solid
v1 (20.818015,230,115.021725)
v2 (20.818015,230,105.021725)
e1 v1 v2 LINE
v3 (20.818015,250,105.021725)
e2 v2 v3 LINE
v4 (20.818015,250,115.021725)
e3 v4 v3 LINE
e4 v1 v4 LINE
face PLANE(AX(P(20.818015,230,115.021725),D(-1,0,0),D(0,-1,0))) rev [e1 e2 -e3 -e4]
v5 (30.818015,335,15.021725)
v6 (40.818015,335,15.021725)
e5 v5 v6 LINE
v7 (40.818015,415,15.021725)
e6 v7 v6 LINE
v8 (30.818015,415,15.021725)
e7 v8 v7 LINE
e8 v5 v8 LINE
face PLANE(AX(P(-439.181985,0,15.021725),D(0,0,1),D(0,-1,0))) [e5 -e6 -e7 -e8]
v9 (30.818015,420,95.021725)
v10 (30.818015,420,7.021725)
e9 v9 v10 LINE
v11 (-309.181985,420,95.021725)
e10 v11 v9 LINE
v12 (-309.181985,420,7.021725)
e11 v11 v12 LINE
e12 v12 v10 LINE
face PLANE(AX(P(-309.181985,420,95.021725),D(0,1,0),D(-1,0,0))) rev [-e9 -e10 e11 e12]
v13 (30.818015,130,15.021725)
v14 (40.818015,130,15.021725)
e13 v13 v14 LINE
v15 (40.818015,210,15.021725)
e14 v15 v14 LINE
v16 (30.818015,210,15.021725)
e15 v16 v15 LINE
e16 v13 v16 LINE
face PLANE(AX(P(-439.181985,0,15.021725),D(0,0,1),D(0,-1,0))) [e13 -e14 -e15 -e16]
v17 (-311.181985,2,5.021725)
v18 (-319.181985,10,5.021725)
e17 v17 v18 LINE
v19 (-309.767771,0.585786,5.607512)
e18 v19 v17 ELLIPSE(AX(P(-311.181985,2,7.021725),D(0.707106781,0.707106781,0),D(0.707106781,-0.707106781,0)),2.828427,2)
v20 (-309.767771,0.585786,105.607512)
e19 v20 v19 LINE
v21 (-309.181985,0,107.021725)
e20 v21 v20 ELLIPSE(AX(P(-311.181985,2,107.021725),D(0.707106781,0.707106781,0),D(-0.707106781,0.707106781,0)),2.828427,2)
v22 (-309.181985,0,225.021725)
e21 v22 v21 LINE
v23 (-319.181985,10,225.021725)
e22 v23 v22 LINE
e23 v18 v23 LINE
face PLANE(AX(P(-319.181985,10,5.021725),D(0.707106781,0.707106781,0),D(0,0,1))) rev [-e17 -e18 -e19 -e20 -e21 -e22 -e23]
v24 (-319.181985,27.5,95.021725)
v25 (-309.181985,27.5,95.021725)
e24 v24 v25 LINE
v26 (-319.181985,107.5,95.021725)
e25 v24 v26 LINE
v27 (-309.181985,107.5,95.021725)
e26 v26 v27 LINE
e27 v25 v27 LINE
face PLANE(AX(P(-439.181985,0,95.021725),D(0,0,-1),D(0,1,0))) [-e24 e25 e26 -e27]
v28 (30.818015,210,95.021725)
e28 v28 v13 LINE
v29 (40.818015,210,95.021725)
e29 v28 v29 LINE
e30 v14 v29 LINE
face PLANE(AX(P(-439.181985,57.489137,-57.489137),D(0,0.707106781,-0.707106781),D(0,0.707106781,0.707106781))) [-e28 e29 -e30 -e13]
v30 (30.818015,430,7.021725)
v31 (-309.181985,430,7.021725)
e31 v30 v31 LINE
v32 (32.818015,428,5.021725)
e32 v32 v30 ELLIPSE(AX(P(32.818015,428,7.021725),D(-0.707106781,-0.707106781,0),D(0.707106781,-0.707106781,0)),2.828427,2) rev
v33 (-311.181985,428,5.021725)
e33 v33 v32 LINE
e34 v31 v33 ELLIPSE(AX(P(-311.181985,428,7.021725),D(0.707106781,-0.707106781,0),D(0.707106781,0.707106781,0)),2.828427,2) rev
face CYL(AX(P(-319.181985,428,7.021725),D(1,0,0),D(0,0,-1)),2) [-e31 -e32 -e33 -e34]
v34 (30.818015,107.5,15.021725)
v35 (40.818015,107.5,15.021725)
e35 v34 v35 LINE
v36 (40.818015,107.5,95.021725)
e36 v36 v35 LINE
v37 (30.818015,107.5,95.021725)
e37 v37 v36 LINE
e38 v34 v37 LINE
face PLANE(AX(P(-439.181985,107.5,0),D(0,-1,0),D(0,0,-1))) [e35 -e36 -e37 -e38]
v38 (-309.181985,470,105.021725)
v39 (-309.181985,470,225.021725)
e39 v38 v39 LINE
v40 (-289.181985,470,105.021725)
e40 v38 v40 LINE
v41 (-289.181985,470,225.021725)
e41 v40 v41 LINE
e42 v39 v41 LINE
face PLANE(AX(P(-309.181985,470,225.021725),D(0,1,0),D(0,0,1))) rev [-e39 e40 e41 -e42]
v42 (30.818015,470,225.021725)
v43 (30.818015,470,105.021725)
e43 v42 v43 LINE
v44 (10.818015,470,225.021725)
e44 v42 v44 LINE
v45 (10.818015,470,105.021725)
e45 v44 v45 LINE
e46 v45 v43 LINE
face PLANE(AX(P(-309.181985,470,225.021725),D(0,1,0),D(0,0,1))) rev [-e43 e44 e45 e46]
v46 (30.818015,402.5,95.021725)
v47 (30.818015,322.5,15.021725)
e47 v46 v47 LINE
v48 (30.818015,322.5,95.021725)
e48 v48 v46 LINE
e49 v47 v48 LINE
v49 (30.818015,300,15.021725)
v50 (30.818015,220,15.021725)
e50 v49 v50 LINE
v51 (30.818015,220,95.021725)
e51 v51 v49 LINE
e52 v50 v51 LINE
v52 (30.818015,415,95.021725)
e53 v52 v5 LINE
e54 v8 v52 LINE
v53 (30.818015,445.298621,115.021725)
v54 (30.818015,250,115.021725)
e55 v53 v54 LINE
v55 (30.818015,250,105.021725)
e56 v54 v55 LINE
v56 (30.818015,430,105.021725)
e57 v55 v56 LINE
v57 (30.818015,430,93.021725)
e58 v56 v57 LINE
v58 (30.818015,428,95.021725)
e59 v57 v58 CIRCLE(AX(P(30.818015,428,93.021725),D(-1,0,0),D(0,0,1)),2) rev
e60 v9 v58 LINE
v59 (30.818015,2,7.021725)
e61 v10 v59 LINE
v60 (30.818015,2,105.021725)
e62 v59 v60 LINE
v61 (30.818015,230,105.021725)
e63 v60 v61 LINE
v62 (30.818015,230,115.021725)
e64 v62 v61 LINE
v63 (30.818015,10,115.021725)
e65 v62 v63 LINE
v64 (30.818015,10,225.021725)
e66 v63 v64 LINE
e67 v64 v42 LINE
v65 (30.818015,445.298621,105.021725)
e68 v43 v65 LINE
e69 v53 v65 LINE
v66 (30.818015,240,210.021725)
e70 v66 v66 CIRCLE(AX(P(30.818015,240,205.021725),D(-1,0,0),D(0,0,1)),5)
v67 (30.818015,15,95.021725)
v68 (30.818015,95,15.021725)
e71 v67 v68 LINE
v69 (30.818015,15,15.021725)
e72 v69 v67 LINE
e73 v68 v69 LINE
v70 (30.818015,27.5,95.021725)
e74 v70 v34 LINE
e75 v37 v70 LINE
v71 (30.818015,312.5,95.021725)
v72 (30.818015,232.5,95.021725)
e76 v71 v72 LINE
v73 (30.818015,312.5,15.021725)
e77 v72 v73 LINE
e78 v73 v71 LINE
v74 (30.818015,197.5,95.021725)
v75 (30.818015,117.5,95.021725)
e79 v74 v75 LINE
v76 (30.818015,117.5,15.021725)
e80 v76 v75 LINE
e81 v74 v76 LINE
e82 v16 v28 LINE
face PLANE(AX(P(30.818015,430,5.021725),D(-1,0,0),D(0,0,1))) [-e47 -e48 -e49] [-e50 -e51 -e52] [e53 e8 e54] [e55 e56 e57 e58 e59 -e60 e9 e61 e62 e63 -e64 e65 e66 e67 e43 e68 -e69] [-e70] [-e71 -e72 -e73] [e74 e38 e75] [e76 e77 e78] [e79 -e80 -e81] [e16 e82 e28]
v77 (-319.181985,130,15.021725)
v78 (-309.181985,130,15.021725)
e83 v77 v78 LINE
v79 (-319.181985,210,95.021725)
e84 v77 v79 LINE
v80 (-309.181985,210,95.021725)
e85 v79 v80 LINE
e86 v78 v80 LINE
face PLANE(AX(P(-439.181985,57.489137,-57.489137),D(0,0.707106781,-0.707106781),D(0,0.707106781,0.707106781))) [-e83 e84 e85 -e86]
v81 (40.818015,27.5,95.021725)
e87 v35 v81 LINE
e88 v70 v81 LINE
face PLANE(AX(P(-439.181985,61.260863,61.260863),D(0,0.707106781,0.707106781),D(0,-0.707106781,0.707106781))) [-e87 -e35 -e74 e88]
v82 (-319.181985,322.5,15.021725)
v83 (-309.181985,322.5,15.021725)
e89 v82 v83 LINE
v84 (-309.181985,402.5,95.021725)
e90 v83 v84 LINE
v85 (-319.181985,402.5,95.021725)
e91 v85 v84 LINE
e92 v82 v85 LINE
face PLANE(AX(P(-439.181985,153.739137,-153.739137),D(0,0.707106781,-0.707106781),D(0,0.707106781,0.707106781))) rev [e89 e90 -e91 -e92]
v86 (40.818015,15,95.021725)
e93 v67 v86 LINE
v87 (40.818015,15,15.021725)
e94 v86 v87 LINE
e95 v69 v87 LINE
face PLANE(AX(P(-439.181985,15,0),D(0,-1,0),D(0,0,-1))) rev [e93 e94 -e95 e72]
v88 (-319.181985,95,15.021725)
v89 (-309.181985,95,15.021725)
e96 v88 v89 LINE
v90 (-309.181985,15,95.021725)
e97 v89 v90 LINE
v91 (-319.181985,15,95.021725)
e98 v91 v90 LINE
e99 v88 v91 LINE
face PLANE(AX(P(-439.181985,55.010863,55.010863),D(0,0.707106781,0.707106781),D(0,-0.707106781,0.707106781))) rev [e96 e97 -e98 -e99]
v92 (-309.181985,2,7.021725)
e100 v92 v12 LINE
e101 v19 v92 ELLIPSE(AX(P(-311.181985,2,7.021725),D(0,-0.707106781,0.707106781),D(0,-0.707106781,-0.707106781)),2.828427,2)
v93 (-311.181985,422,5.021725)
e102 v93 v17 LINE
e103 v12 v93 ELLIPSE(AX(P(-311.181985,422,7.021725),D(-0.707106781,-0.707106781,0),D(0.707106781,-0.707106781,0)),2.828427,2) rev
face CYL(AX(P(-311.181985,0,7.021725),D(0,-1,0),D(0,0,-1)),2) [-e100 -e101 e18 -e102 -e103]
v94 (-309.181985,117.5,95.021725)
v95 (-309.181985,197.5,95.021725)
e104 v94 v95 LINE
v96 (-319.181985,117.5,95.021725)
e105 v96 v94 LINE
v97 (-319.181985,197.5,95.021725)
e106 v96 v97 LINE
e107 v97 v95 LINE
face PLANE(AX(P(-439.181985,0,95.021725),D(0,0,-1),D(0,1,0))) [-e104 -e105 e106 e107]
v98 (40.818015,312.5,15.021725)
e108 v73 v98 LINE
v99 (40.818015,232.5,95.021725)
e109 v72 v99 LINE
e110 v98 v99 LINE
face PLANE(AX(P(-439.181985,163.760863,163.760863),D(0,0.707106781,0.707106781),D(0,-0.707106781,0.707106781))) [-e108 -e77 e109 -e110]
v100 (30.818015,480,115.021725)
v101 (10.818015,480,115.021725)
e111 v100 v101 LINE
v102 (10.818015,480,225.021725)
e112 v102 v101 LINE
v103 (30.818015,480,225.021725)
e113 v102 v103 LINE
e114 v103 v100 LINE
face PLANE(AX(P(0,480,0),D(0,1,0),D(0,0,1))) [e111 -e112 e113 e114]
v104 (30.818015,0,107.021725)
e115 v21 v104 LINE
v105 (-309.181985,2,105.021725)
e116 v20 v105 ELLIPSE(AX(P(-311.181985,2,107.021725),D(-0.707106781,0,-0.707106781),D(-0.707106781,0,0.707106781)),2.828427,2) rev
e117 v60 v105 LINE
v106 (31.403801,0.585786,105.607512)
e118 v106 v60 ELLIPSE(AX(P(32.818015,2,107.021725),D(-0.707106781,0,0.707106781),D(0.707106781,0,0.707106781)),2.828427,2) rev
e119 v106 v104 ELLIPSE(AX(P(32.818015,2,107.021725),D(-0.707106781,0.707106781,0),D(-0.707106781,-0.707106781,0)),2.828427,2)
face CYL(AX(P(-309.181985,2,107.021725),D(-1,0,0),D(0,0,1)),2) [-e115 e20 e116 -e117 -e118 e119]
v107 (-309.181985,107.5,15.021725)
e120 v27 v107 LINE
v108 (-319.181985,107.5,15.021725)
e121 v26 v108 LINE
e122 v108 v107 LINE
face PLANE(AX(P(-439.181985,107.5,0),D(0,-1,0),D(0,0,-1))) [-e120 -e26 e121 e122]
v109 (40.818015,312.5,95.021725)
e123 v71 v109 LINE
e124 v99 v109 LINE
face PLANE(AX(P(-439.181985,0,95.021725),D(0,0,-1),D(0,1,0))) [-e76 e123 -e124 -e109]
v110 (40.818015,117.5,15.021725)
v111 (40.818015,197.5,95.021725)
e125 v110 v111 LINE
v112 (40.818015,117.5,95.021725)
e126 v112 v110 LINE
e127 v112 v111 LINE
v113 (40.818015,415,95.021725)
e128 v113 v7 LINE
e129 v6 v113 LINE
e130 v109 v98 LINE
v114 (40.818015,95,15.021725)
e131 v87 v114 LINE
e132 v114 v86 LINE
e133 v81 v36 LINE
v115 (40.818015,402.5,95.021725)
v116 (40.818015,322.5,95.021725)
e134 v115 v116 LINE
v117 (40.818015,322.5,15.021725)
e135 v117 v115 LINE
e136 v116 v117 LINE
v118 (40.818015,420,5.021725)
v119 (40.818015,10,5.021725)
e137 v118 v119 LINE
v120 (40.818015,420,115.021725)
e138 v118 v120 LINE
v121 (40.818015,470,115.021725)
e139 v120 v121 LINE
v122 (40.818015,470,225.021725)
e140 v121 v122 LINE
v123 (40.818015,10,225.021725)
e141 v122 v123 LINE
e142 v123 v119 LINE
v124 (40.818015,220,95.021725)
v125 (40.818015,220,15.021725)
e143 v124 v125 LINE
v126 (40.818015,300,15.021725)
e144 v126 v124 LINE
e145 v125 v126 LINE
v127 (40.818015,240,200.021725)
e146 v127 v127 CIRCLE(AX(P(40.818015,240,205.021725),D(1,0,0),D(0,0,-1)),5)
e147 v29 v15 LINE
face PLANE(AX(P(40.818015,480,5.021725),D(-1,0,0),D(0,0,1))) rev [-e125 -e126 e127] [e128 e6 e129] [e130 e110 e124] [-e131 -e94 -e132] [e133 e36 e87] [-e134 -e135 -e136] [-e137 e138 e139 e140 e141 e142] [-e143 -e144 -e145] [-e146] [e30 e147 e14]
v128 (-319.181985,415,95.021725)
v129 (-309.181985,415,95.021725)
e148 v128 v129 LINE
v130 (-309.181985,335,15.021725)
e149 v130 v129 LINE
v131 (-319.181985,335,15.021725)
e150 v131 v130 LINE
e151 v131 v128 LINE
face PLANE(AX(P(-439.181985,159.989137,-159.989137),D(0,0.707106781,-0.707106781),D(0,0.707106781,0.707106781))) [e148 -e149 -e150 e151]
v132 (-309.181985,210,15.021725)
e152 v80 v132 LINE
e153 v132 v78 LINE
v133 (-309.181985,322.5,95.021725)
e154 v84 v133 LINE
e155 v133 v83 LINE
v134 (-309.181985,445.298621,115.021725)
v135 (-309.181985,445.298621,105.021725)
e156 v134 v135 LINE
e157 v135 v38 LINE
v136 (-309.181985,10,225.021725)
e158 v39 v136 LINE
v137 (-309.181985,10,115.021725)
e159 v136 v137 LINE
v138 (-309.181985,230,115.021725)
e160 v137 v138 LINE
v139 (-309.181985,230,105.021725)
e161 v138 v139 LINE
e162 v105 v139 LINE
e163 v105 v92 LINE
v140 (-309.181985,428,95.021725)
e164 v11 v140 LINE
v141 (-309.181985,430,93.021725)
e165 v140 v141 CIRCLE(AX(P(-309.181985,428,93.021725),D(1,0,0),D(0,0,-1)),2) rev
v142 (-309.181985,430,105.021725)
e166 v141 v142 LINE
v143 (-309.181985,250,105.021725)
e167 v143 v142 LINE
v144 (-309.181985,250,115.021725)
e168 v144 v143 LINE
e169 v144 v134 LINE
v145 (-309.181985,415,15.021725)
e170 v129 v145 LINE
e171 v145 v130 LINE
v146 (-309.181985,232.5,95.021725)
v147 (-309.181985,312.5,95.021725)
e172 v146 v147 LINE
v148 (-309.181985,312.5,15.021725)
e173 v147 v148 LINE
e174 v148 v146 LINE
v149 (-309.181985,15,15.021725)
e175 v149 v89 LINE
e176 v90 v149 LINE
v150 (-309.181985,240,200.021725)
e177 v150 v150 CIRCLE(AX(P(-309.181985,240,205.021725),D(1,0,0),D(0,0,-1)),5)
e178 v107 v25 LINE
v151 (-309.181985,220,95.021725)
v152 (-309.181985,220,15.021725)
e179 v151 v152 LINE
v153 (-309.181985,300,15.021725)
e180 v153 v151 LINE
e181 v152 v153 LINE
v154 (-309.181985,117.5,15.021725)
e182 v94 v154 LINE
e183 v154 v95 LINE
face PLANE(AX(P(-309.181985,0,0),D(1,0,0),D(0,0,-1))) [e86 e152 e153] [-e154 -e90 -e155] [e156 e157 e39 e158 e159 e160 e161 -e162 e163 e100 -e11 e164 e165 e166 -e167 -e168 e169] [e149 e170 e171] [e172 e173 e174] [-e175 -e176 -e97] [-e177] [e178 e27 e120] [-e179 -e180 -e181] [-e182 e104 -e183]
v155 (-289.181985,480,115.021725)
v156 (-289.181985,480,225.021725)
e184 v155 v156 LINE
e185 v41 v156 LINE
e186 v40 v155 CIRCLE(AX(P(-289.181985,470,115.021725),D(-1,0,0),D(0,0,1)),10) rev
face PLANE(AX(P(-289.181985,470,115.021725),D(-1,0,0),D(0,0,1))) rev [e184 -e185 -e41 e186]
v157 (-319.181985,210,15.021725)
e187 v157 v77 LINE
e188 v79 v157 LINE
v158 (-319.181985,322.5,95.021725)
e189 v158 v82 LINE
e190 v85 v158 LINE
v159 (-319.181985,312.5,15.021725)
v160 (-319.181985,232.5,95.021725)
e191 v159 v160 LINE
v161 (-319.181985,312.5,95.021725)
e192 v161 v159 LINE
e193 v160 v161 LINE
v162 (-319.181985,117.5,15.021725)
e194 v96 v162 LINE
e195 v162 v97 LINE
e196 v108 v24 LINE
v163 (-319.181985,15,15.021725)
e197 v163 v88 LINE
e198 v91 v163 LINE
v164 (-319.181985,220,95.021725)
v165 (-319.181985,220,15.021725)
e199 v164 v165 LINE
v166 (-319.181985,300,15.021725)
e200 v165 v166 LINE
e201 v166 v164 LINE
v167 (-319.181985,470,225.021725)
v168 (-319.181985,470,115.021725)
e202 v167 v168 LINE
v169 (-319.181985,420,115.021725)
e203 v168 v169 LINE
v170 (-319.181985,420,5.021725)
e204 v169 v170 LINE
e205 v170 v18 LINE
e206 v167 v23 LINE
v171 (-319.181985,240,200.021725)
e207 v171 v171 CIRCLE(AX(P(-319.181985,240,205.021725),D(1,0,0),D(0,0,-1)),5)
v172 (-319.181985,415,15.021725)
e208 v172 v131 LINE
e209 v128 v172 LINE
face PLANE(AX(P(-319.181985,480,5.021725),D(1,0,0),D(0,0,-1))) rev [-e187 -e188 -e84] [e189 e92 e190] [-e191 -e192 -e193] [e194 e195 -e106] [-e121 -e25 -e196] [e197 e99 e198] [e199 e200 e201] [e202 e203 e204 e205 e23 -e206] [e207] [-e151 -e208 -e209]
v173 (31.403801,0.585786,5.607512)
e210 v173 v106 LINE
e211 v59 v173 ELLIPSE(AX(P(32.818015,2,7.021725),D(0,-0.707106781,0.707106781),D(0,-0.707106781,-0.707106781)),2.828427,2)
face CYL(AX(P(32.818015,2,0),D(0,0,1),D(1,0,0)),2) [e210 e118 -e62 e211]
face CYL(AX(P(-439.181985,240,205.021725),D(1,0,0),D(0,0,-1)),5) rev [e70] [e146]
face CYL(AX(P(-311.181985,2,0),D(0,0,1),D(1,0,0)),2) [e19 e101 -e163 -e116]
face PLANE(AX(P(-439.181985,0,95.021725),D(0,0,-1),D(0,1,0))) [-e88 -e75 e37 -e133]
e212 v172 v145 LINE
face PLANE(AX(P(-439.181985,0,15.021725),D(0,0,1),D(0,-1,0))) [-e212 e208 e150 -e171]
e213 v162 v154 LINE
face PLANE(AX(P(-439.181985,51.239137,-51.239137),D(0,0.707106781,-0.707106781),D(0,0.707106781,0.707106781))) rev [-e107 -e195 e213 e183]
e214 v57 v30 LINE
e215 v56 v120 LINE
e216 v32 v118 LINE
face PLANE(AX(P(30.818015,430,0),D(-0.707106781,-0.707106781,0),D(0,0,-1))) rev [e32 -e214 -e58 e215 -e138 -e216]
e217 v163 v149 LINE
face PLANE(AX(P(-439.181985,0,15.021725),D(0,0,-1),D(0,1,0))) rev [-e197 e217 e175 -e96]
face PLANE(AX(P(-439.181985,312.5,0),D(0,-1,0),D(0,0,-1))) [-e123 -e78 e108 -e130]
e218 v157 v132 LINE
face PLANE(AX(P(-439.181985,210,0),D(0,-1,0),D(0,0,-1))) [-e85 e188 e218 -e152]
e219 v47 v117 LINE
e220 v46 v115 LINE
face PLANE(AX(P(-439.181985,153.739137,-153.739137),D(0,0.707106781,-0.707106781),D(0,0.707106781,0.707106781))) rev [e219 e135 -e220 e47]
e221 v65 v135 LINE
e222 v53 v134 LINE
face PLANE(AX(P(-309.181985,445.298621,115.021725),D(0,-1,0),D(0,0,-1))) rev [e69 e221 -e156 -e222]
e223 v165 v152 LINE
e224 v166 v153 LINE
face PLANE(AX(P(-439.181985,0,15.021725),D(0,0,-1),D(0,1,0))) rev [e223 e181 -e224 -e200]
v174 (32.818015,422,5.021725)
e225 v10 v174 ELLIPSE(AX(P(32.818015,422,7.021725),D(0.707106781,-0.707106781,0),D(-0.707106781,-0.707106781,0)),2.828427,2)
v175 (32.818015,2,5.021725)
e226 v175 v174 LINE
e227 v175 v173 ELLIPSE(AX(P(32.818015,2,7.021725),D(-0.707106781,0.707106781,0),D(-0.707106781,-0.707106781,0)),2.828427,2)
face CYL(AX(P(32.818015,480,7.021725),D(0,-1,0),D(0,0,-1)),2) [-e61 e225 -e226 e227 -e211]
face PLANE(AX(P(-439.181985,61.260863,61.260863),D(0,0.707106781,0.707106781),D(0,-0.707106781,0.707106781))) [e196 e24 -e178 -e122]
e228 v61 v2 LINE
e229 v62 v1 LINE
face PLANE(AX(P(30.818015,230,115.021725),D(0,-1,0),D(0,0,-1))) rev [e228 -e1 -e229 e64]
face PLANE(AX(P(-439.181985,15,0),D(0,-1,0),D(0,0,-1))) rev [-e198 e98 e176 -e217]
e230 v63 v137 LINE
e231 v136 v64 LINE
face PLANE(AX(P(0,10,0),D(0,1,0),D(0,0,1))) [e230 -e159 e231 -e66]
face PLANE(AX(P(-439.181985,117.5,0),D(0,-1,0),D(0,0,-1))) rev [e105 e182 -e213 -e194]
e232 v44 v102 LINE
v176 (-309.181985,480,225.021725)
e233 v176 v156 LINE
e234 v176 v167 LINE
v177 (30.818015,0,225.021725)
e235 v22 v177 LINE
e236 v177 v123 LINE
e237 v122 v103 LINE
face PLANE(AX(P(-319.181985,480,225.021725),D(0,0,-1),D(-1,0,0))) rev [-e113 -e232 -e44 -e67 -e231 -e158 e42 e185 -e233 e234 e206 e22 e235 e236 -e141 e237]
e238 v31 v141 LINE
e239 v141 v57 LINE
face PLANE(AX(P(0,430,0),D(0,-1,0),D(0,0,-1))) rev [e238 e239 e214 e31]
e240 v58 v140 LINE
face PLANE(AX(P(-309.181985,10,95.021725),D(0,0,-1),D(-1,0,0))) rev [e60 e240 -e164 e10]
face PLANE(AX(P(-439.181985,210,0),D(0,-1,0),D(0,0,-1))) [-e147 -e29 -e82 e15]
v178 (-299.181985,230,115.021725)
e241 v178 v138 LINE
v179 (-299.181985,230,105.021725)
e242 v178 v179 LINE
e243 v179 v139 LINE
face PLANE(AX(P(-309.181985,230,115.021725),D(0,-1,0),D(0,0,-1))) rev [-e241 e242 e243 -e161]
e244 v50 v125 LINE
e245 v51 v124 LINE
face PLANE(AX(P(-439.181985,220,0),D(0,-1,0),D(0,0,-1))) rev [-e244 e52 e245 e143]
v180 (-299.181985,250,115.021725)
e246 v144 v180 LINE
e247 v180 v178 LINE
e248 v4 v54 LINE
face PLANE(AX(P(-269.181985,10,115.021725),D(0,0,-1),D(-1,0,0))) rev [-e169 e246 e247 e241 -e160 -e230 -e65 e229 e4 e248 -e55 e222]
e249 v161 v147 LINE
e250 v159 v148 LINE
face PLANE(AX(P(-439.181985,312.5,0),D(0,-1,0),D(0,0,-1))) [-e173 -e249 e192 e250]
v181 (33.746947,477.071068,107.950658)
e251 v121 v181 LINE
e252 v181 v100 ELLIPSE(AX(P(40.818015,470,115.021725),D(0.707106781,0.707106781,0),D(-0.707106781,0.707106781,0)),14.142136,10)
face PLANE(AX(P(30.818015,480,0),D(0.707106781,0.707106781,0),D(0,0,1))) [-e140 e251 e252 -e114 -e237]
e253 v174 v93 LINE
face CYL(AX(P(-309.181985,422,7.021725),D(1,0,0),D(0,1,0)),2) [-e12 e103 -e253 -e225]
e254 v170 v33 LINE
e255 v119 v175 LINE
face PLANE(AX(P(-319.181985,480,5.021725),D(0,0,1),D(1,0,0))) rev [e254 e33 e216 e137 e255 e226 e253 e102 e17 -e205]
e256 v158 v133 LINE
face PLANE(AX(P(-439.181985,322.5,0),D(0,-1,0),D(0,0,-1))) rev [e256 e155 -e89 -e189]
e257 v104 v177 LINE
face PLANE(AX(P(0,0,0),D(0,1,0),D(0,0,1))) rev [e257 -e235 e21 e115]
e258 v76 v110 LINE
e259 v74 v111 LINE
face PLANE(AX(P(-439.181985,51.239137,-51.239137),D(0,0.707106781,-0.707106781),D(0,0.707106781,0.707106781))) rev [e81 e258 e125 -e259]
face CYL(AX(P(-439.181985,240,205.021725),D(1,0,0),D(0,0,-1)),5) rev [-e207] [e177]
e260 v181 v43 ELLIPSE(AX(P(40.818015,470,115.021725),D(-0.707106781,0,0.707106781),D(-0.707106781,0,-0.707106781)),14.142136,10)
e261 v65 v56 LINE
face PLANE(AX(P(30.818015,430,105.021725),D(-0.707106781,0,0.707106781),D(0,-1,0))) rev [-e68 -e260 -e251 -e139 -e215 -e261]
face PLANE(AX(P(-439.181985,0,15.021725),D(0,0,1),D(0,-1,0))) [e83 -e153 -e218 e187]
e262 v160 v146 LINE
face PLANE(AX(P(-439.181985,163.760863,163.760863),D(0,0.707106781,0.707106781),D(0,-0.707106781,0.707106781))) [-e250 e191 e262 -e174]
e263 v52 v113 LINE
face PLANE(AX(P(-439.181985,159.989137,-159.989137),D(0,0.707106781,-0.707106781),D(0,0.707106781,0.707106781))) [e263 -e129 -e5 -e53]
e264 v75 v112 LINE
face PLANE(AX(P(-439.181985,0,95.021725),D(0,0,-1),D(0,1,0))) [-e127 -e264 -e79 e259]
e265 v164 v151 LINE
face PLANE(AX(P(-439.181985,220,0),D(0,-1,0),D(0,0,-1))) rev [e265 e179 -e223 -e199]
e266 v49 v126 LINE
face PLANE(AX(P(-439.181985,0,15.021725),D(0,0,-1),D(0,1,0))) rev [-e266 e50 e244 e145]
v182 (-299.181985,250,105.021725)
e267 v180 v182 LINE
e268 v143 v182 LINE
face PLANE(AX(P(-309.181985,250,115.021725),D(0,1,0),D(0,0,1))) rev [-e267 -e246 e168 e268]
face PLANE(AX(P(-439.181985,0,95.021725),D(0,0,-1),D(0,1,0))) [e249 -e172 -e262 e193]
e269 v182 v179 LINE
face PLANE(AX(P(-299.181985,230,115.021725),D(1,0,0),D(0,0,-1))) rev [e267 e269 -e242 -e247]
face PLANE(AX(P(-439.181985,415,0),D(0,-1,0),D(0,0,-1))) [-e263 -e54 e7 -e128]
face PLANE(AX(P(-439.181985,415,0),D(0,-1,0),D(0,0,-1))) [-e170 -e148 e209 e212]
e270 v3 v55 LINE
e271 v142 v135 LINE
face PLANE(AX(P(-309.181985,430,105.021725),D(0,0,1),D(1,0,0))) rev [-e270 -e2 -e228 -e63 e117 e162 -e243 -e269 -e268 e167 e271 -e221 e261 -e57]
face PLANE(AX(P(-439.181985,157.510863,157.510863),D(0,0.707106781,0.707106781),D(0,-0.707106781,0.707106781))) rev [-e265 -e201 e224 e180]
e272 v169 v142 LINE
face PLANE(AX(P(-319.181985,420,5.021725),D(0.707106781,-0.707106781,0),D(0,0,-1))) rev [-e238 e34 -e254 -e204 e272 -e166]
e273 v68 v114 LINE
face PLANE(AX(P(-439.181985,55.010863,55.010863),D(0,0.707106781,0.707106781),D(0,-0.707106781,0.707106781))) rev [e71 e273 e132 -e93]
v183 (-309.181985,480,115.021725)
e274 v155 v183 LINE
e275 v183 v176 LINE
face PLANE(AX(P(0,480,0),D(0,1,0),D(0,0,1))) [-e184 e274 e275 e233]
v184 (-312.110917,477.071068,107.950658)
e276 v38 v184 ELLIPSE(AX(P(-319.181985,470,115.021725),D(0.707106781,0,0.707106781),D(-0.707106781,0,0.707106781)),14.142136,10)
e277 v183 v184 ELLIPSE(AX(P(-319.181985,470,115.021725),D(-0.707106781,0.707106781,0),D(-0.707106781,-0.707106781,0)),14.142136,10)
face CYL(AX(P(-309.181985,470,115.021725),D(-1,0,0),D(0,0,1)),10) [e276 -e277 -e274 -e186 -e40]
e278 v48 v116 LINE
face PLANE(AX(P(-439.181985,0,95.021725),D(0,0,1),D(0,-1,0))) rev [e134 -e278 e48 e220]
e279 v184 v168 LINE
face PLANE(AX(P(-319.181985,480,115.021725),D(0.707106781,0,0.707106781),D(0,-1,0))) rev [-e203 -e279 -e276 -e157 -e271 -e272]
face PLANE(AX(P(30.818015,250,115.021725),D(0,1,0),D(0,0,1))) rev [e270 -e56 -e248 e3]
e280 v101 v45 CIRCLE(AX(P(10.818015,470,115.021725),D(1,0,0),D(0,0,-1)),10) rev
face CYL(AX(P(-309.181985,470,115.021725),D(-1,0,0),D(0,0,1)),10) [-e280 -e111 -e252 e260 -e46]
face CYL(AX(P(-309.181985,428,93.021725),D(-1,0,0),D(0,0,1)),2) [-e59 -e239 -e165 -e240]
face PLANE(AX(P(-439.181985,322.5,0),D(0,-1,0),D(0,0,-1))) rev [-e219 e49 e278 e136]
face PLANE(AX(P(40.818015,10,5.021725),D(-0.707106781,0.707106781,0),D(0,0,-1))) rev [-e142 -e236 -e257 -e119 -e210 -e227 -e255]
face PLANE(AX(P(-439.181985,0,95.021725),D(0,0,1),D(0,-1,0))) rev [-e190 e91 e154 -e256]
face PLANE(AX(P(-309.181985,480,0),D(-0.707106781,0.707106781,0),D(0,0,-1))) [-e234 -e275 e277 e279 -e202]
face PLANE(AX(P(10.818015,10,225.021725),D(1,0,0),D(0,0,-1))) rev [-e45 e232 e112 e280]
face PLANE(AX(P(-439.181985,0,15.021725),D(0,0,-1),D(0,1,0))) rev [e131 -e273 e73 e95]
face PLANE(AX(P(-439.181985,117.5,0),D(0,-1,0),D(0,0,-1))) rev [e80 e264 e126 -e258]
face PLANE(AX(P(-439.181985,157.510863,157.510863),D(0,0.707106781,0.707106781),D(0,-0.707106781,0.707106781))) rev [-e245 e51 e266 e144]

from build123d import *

# Parameters (mm, degrees)
SKETCH2_W                = 360
SKETCH2_H                = 220
BOSS_EXTRUDE1_DEPTH      = 480
SKETCH4_W                = 280
SKETCH4_H                = 110
CUT_EXTRUDE2_DEPTH       = 470
SKETCH5_W                = 110
SKETCH5_H                = 460
CUT_EXTRUDE3_DEPTH       = 40
SKETCH6_W                = 340
SKETCH6_H                = 100
CUT_EXTRUDE4_DEPTH       = 50
SKETCH7_W                = 340
SKETCH7_H                = 10
CUT_EXTRUDE5_DEPTH       = 420
SKETCH8_W                = 340
SKETCH8_H                = 410
CUT_EXTRUDE6_DEPTH       = 90
SKETCH12_W               = 10
SKETCH12_H               = 20
CUT_EXTRUDE9_DEPTH       = 10
CUT_EXTRUDE11_DEPTH      = 470
CUT_EXTRUDE11_DEPTH_BACK = 10
SKETCH18_W               = 100
SKETCH18_H               = 50
SKETCH23_W               = 110
SKETCH23_H               = 460
CUT_EXTRUDE13_DEPTH      = 20
SKETCH24_W               = 20
SKETCH24_H               = 110
CUT_EXTRUDE14_DEPTH      = 10
SKETCH26_R               = 5
CUT_EXTRUDE15_DEPTH      = 480
CUT_EXTRUDE16_DEPTH      = 480
SKETCH28_W               = 340
SKETCH28_H               = 10
CUT_EXTRUDE17_DEPTH      = 100
CHAMFER1_SIZE            = 10
CHAMFER2_SIZE            = 10
FILLET2_R                = 10
CHAMFER3_SIZE            = 10
FILLET4_R                = 2
FILLET5_R                = 2
CHAMFER4_SIZE            = 10
SKETCH29_W               = 340
SKETCH29_H               = 24.70137943
CUT_EXTRUDE18_DEPTH      = 10
SKETCH30_W               = 300
SKETCH30_H               = 27.571183361
CUT_EXTRUDE19_DEPTH      = 10


# Some blends are built 0.0001 mm under size
with BuildPart() as part:
    # Sketch2 → Boss-Extrude1 (new body)
    with BuildSketch(Plane(origin=(0, 0, 0), x_dir=(1, 0, 0), z_dir=(0, 1, 0))):
        with Locations((-139.181984943, -115.021725484)):
            Rectangle(SKETCH2_W, SKETCH2_H)
    extrude(amount=BOSS_EXTRUDE1_DEPTH)

    # Sketch4 → Cut-Extrude2 (cut)
    with BuildSketch(Plane(origin=(0, 480, 0), x_dir=(1, 0, 0), z_dir=(0, 1, 0))):
        with Locations((-129.181984943, -170.021725484)):
            Rectangle(SKETCH4_W, SKETCH4_H)
    extrude(amount=-CUT_EXTRUDE2_DEPTH, mode=Mode.SUBTRACT)

    # Sketch5 → Cut-Extrude3 (cut)
    with BuildSketch(Plane(origin=(-269.181984943, 0, 0), x_dir=(0, 0, -1), z_dir=(1, 0, 0))):
        with Locations((-170.021725484, 240)):
            Rectangle(SKETCH5_W, SKETCH5_H)
    extrude(amount=-CUT_EXTRUDE3_DEPTH, mode=Mode.SUBTRACT)

    # Sketch6 → Cut-Extrude4 (cut)
    with BuildSketch(Plane(origin=(0, 480, 0), x_dir=(1, 0, 0), z_dir=(0, 1, 0))):
        with Locations((-139.181984943, -55.021725484)):
            Rectangle(SKETCH6_W, SKETCH6_H)
    extrude(amount=-CUT_EXTRUDE4_DEPTH, mode=Mode.SUBTRACT)

    # Sketch7 → Cut-Extrude5 (cut)
    with BuildSketch(Plane(origin=(0, 430, 0), x_dir=(1, 0, 0), z_dir=(0, 1, 0))):
        with Locations((-139.181984943, -100.021725484)):
            Rectangle(SKETCH7_W, SKETCH7_H)
    extrude(amount=-CUT_EXTRUDE5_DEPTH, mode=Mode.SUBTRACT)

    # Sketch8 → Cut-Extrude6 (cut)
    with BuildSketch(Plane(origin=(0, 0, 5.021725484), x_dir=(-1, 0, 0), z_dir=(0, 0, -1))):
        with Locations((139.181984943, 215)):
            Rectangle(SKETCH8_W, SKETCH8_H)
    extrude(amount=-CUT_EXTRUDE6_DEPTH, mode=Mode.SUBTRACT)

    # Sketch12 → Cut-Extrude9 (cut)
    with BuildSketch(Plane(origin=(0, 0, 105.021725484), x_dir=(-1, 0, 0), z_dir=(0, 0, -1))):
        with Locations((-25.818015057, 240)):
            Rectangle(SKETCH12_W, SKETCH12_H)
        with Locations((304.181984943, 240)):
            Rectangle(SKETCH12_W, SKETCH12_H)
    extrude(amount=-CUT_EXTRUDE9_DEPTH, mode=Mode.SUBTRACT)

    # Sketch18 → Cut-Extrude11 (cut, two sides: drawn at the far end of the back side and taken through both)
    with BuildSketch(Plane(origin=(-309.181984943, 0, 0), x_dir=(0, 0, -1), z_dir=(1, 0, 0)).offset(-CUT_EXTRUDE11_DEPTH_BACK)):
        with Locations((-55.021725484, 455)):
            Rectangle(SKETCH18_W, SKETCH18_H)
    extrude(amount=CUT_EXTRUDE11_DEPTH + CUT_EXTRUDE11_DEPTH_BACK, mode=Mode.SUBTRACT)

    # Sketch23 → Cut-Extrude13 (cut)
    with BuildSketch(Plane.ZY.offset(-10.818015057)):
        with Locations((170.021725484, 240)):
            Rectangle(SKETCH23_W, SKETCH23_H)
    extrude(amount=-CUT_EXTRUDE13_DEPTH, mode=Mode.SUBTRACT)

    # Sketch24 → Cut-Extrude14 (cut)
    with BuildSketch(Plane(origin=(0, 480, 0), x_dir=(1, 0, 0), z_dir=(0, 1, 0))):
        with Locations((-279.181984943, -170.021725484)):
            Rectangle(SKETCH24_W, SKETCH24_H)
    extrude(amount=-CUT_EXTRUDE14_DEPTH, mode=Mode.SUBTRACT)

    # Sketch26 → Cut-Extrude15 (cut)
    with BuildSketch(Plane(origin=(40.818015057, 0, 0), x_dir=(0, 0, -1), z_dir=(1, 0, 0))):
        with Locations((-205.021725484, 240)):
            Circle(SKETCH26_R)
    extrude(amount=-CUT_EXTRUDE15_DEPTH, mode=Mode.SUBTRACT)

    # Sketch27 → Cut-Extrude16 (cut)
    with BuildSketch(Plane(origin=(40.818015057, 0, 0), x_dir=(0, 0, -1), z_dir=(1, 0, 0))):
        Polygon((-15.021725484, 335), (-95.021725484, 415), (-15.021725484, 415), align=None)
        Polygon((-15.021725484, 322.5), (-95.021725484, 402.5), (-95.021725484, 322.5), align=None)
        Polygon((-15.021725484, 312.5), (-95.021725484, 232.5), (-95.021725484, 312.5), align=None)
        Polygon((-15.021725484, 220), (-15.021725484, 300), (-95.021725484, 220), align=None)
        Polygon((-15.021725484, 130), (-95.021725484, 210), (-15.021725484, 210), align=None)
        Polygon((-95.021725484, 117.5), (-95.021725484, 197.5), (-15.021725484, 117.5), align=None)
        Polygon((-15.021725484, 107.5), (-95.021725484, 27.5), (-95.021725484, 107.5), align=None)
        Polygon((-15.021725484, 15), (-15.021725484, 95), (-95.021725484, 15), align=None)
    extrude(amount=-CUT_EXTRUDE16_DEPTH, mode=Mode.SUBTRACT)

    # Sketch28 → Cut-Extrude17 (cut)
    with BuildSketch(Plane(origin=(0, 0, 5.021725484), x_dir=(-1, 0, 0), z_dir=(0, 0, -1))):
        with Locations((139.181984943, 5)):
            Rectangle(SKETCH28_W, SKETCH28_H)
    extrude(amount=-CUT_EXTRUDE17_DEPTH, mode=Mode.SUBTRACT)

    # Chamfer1
    chamfer1_edges = [part.edges().sort_by_distance(p)[0] for p in [
        (40.818015057, 430, 55.021725484),
        (-319.181984943, 430, 55.021725484),
    ]]
    chamfer(chamfer1_edges, length=CHAMFER1_SIZE - 0.0001)  # a hair under: the kernel refuses the full size

    # Chamfer2
    chamfer2_edges = [part.edges().sort_by_distance(p)[0] for p in [
        (-319.181984943, 480, 165.021725484),
        (40.818015057, 480, 165.021725484),
    ]]
    chamfer(chamfer2_edges, length=CHAMFER2_SIZE)

    # Fillet2
    fillet2_edges = [part.edges().sort_by_distance(p)[0] for p in [
        (-139.181984943, 480, 105.021725484),
    ]]
    fillet(fillet2_edges, radius=FILLET2_R - 0.0001)  # a hair under: the kernel refuses the full size

    # Chamfer3
    # the kernel refuses this chamfer: 10 mm, written as the material it takes off along each edge
    with BuildSketch(Plane(origin=(-319.181984943, 495.71682988, 105.021725484), x_dir=(0.9996219169112968, 0, -0.027495876610586282), z_dir=(0, -1, 0))) as chamfer3_piece_1_section:
        Polygon((CHAMFER3_SIZE * 0.999621916911, CHAMFER3_SIZE * 0.0274958766106), (-CHAMFER3_SIZE * 0.0274958766106, CHAMFER3_SIZE * 0.999621916911), (0, 0), align=None)
    chamfer3_piece_1 = extrude(amount=101.433559759, mode=Mode.PRIVATE)
    chamfer3_piece_1 = split(chamfer3_piece_1, bisect_by=Plane(origin=(-315.895641605, 430, 108.325767027), z_dir=(0, 1, 0)), keep=Keep.TOP, mode=Mode.PRIVATE)
    chamfer3_piece_1 = split(chamfer3_piece_1, bisect_by=Plane(origin=(-309.181984943, 462.85841494, 108.325767027), z_dir=(-1, 0, 0)), keep=Keep.TOP, mode=Mode.PRIVATE)
    add(chamfer3_piece_1, mode=Mode.SUBTRACT)
    with BuildSketch(Plane(origin=(-319.181984943, 495.71682988, 105.021725484), x_dir=(0.9996219169112968, 0, -0.027495876610586282), z_dir=(0, -1, 0))) as chamfer3_piece_2_section:
        Polygon((CHAMFER3_SIZE * 0.999621916911, CHAMFER3_SIZE * 0.0274958766106), (-CHAMFER3_SIZE * 0.0274958766106, CHAMFER3_SIZE * 0.999621916911), (0, 0), align=None)
    chamfer3_piece_2 = extrude(amount=101.433559759, mode=Mode.PRIVATE)
    chamfer3_piece_2 = split(chamfer3_piece_2, bisect_by=Plane(origin=(-314.919016281, 424.263068662, 108.826082354), z_dir=(-0.7071067811865476, 0.7071067811865476, 0)), keep=Keep.TOP, mode=Mode.PRIVATE)
    chamfer3_piece_2 = split(chamfer3_piece_2, bisect_by=Plane(origin=(-316.831326727, 430, 108.826082354), z_dir=(0, -1, 0)), keep=Keep.TOP, mode=Mode.PRIVATE)
    add(chamfer3_piece_2, mode=Mode.SUBTRACT)
    with BuildSketch(Plane(origin=(40.818015057, 394.28327012, 105.021725484), x_dir=(-0.9996219169112968, 0, -0.027495876610586317), z_dir=(0, 1, 0))) as chamfer3_piece_3_section:
        Polygon((CHAMFER3_SIZE * 0.999621916911, CHAMFER3_SIZE * 0.0274958766106), (-CHAMFER3_SIZE * 0.0274958766106, CHAMFER3_SIZE * 0.999621916911), (0, 0), align=None)
    chamfer3_piece_3 = extrude(amount=101.433559759, mode=Mode.PRIVATE)
    chamfer3_piece_3 = split(chamfer3_piece_3, bisect_by=Plane(origin=(36.555046395, 424.263068662, 108.826082354), z_dir=(0.7071067811865485, 0.7071067811865467, 0)), keep=Keep.TOP, mode=Mode.PRIVATE)
    chamfer3_piece_3 = split(chamfer3_piece_3, bisect_by=Plane(origin=(38.46735684, 430, 108.826082354), z_dir=(0, -1, 0)), keep=Keep.TOP, mode=Mode.PRIVATE)
    add(chamfer3_piece_3, mode=Mode.SUBTRACT)
    with BuildSketch(Plane(origin=(40.818015057, 394.28327012, 105.021725484), x_dir=(-0.9996219169112968, 0, -0.027495876610586317), z_dir=(0, 1, 0))) as chamfer3_piece_4_section:
        Polygon((CHAMFER3_SIZE * 0.999621916911, CHAMFER3_SIZE * 0.0274958766106), (-CHAMFER3_SIZE * 0.0274958766106, CHAMFER3_SIZE * 0.999621916911), (0, 0), align=None)
    chamfer3_piece_4 = extrude(amount=101.433559759, mode=Mode.PRIVATE)
    chamfer3_piece_4 = split(chamfer3_piece_4, bisect_by=Plane(origin=(37.531671719, 430, 108.325767027), z_dir=(0, 1, 0)), keep=Keep.TOP, mode=Mode.PRIVATE)
    chamfer3_piece_4 = split(chamfer3_piece_4, bisect_by=Plane(origin=(30.818015057, 462.85841494, 108.325767027), z_dir=(1, 0, 0)), keep=Keep.TOP, mode=Mode.PRIVATE)
    add(chamfer3_piece_4, mode=Mode.SUBTRACT)

    # Fillet4
    fillet4_edges = [part.edges().sort_by_distance(p)[0] for p in [
        (-139.181984943, 0, 105.021725484),
        (-309.181984943, 0, 55.021725484),
        (30.818015057, 0, 55.021725484),
        (-139.181984943, 430, 5.021725484),
        (30.818015057, 210, 5.021725484),
        (-139.181984943, 420, 5.021725484),
        (-309.181984943, 210, 5.021725484),
    ]]
    fillet(fillet4_edges, radius=FILLET4_R)

    # Fillet5
    fillet5_edges = [part.edges().sort_by_distance(p)[0] for p in [
        (-139.181984943, 430, 95.021725484),
    ]]
    fillet(fillet5_edges, radius=FILLET5_R)

    # Chamfer4
    # the kernel refuses this chamfer: 10 mm, written as the material it takes off along each edge
    with BuildSketch(Plane(origin=(-319.181984943, 0, 250.738555364), x_dir=(0.9996219169112968, -0.027495876610586334, 0), z_dir=(0, 0, -1))) as chamfer4_piece_1:
        Polygon((CHAMFER4_SIZE * 0.999621916911, -CHAMFER4_SIZE * 0.0274958766106), (-CHAMFER4_SIZE * 0.0274958766106, -CHAMFER4_SIZE * 0.999621916911), (0, 0), align=None)
    extrude(amount=271.433659759, mode=Mode.SUBTRACT)
    with BuildSketch(Plane(origin=(40.818015057, 0, -20.695104396), x_dir=(0.027495876610586317, 0.9996219169112968, 0), z_dir=(0, 0, 1))) as chamfer4_piece_2:
        Polygon((CHAMFER4_SIZE * 0.999621916911, CHAMFER4_SIZE * 0.0274958766106), (-CHAMFER4_SIZE * 0.0274958766106, CHAMFER4_SIZE * 0.999621916911), (0, 0), align=None)
    extrude(amount=271.433659759, mode=Mode.SUBTRACT)

    # Sketch29 → Cut-Extrude18 (cut)
    with BuildSketch(Plane(origin=(0, 0, 105.021725484), x_dir=(-1, 0, 0), z_dir=(0, 0, -1))):
        with Locations((139.181984943, 457.649310285)):
            Rectangle(SKETCH29_W, SKETCH29_H)
    extrude(amount=-CUT_EXTRUDE18_DEPTH, mode=Mode.SUBTRACT)

    # Sketch30 → Cut-Extrude19 (cut)
    with BuildSketch(Plane(origin=(0, 480, 0), x_dir=(1, 0, 0), z_dir=(0, 1, 0))):
        with Locations((-139.181984943, -101.236133803)):
            Rectangle(SKETCH30_W, SKETCH30_H)
    extrude(amount=-CUT_EXTRUDE19_DEPTH, mode=Mode.SUBTRACT)


solid = part.part
